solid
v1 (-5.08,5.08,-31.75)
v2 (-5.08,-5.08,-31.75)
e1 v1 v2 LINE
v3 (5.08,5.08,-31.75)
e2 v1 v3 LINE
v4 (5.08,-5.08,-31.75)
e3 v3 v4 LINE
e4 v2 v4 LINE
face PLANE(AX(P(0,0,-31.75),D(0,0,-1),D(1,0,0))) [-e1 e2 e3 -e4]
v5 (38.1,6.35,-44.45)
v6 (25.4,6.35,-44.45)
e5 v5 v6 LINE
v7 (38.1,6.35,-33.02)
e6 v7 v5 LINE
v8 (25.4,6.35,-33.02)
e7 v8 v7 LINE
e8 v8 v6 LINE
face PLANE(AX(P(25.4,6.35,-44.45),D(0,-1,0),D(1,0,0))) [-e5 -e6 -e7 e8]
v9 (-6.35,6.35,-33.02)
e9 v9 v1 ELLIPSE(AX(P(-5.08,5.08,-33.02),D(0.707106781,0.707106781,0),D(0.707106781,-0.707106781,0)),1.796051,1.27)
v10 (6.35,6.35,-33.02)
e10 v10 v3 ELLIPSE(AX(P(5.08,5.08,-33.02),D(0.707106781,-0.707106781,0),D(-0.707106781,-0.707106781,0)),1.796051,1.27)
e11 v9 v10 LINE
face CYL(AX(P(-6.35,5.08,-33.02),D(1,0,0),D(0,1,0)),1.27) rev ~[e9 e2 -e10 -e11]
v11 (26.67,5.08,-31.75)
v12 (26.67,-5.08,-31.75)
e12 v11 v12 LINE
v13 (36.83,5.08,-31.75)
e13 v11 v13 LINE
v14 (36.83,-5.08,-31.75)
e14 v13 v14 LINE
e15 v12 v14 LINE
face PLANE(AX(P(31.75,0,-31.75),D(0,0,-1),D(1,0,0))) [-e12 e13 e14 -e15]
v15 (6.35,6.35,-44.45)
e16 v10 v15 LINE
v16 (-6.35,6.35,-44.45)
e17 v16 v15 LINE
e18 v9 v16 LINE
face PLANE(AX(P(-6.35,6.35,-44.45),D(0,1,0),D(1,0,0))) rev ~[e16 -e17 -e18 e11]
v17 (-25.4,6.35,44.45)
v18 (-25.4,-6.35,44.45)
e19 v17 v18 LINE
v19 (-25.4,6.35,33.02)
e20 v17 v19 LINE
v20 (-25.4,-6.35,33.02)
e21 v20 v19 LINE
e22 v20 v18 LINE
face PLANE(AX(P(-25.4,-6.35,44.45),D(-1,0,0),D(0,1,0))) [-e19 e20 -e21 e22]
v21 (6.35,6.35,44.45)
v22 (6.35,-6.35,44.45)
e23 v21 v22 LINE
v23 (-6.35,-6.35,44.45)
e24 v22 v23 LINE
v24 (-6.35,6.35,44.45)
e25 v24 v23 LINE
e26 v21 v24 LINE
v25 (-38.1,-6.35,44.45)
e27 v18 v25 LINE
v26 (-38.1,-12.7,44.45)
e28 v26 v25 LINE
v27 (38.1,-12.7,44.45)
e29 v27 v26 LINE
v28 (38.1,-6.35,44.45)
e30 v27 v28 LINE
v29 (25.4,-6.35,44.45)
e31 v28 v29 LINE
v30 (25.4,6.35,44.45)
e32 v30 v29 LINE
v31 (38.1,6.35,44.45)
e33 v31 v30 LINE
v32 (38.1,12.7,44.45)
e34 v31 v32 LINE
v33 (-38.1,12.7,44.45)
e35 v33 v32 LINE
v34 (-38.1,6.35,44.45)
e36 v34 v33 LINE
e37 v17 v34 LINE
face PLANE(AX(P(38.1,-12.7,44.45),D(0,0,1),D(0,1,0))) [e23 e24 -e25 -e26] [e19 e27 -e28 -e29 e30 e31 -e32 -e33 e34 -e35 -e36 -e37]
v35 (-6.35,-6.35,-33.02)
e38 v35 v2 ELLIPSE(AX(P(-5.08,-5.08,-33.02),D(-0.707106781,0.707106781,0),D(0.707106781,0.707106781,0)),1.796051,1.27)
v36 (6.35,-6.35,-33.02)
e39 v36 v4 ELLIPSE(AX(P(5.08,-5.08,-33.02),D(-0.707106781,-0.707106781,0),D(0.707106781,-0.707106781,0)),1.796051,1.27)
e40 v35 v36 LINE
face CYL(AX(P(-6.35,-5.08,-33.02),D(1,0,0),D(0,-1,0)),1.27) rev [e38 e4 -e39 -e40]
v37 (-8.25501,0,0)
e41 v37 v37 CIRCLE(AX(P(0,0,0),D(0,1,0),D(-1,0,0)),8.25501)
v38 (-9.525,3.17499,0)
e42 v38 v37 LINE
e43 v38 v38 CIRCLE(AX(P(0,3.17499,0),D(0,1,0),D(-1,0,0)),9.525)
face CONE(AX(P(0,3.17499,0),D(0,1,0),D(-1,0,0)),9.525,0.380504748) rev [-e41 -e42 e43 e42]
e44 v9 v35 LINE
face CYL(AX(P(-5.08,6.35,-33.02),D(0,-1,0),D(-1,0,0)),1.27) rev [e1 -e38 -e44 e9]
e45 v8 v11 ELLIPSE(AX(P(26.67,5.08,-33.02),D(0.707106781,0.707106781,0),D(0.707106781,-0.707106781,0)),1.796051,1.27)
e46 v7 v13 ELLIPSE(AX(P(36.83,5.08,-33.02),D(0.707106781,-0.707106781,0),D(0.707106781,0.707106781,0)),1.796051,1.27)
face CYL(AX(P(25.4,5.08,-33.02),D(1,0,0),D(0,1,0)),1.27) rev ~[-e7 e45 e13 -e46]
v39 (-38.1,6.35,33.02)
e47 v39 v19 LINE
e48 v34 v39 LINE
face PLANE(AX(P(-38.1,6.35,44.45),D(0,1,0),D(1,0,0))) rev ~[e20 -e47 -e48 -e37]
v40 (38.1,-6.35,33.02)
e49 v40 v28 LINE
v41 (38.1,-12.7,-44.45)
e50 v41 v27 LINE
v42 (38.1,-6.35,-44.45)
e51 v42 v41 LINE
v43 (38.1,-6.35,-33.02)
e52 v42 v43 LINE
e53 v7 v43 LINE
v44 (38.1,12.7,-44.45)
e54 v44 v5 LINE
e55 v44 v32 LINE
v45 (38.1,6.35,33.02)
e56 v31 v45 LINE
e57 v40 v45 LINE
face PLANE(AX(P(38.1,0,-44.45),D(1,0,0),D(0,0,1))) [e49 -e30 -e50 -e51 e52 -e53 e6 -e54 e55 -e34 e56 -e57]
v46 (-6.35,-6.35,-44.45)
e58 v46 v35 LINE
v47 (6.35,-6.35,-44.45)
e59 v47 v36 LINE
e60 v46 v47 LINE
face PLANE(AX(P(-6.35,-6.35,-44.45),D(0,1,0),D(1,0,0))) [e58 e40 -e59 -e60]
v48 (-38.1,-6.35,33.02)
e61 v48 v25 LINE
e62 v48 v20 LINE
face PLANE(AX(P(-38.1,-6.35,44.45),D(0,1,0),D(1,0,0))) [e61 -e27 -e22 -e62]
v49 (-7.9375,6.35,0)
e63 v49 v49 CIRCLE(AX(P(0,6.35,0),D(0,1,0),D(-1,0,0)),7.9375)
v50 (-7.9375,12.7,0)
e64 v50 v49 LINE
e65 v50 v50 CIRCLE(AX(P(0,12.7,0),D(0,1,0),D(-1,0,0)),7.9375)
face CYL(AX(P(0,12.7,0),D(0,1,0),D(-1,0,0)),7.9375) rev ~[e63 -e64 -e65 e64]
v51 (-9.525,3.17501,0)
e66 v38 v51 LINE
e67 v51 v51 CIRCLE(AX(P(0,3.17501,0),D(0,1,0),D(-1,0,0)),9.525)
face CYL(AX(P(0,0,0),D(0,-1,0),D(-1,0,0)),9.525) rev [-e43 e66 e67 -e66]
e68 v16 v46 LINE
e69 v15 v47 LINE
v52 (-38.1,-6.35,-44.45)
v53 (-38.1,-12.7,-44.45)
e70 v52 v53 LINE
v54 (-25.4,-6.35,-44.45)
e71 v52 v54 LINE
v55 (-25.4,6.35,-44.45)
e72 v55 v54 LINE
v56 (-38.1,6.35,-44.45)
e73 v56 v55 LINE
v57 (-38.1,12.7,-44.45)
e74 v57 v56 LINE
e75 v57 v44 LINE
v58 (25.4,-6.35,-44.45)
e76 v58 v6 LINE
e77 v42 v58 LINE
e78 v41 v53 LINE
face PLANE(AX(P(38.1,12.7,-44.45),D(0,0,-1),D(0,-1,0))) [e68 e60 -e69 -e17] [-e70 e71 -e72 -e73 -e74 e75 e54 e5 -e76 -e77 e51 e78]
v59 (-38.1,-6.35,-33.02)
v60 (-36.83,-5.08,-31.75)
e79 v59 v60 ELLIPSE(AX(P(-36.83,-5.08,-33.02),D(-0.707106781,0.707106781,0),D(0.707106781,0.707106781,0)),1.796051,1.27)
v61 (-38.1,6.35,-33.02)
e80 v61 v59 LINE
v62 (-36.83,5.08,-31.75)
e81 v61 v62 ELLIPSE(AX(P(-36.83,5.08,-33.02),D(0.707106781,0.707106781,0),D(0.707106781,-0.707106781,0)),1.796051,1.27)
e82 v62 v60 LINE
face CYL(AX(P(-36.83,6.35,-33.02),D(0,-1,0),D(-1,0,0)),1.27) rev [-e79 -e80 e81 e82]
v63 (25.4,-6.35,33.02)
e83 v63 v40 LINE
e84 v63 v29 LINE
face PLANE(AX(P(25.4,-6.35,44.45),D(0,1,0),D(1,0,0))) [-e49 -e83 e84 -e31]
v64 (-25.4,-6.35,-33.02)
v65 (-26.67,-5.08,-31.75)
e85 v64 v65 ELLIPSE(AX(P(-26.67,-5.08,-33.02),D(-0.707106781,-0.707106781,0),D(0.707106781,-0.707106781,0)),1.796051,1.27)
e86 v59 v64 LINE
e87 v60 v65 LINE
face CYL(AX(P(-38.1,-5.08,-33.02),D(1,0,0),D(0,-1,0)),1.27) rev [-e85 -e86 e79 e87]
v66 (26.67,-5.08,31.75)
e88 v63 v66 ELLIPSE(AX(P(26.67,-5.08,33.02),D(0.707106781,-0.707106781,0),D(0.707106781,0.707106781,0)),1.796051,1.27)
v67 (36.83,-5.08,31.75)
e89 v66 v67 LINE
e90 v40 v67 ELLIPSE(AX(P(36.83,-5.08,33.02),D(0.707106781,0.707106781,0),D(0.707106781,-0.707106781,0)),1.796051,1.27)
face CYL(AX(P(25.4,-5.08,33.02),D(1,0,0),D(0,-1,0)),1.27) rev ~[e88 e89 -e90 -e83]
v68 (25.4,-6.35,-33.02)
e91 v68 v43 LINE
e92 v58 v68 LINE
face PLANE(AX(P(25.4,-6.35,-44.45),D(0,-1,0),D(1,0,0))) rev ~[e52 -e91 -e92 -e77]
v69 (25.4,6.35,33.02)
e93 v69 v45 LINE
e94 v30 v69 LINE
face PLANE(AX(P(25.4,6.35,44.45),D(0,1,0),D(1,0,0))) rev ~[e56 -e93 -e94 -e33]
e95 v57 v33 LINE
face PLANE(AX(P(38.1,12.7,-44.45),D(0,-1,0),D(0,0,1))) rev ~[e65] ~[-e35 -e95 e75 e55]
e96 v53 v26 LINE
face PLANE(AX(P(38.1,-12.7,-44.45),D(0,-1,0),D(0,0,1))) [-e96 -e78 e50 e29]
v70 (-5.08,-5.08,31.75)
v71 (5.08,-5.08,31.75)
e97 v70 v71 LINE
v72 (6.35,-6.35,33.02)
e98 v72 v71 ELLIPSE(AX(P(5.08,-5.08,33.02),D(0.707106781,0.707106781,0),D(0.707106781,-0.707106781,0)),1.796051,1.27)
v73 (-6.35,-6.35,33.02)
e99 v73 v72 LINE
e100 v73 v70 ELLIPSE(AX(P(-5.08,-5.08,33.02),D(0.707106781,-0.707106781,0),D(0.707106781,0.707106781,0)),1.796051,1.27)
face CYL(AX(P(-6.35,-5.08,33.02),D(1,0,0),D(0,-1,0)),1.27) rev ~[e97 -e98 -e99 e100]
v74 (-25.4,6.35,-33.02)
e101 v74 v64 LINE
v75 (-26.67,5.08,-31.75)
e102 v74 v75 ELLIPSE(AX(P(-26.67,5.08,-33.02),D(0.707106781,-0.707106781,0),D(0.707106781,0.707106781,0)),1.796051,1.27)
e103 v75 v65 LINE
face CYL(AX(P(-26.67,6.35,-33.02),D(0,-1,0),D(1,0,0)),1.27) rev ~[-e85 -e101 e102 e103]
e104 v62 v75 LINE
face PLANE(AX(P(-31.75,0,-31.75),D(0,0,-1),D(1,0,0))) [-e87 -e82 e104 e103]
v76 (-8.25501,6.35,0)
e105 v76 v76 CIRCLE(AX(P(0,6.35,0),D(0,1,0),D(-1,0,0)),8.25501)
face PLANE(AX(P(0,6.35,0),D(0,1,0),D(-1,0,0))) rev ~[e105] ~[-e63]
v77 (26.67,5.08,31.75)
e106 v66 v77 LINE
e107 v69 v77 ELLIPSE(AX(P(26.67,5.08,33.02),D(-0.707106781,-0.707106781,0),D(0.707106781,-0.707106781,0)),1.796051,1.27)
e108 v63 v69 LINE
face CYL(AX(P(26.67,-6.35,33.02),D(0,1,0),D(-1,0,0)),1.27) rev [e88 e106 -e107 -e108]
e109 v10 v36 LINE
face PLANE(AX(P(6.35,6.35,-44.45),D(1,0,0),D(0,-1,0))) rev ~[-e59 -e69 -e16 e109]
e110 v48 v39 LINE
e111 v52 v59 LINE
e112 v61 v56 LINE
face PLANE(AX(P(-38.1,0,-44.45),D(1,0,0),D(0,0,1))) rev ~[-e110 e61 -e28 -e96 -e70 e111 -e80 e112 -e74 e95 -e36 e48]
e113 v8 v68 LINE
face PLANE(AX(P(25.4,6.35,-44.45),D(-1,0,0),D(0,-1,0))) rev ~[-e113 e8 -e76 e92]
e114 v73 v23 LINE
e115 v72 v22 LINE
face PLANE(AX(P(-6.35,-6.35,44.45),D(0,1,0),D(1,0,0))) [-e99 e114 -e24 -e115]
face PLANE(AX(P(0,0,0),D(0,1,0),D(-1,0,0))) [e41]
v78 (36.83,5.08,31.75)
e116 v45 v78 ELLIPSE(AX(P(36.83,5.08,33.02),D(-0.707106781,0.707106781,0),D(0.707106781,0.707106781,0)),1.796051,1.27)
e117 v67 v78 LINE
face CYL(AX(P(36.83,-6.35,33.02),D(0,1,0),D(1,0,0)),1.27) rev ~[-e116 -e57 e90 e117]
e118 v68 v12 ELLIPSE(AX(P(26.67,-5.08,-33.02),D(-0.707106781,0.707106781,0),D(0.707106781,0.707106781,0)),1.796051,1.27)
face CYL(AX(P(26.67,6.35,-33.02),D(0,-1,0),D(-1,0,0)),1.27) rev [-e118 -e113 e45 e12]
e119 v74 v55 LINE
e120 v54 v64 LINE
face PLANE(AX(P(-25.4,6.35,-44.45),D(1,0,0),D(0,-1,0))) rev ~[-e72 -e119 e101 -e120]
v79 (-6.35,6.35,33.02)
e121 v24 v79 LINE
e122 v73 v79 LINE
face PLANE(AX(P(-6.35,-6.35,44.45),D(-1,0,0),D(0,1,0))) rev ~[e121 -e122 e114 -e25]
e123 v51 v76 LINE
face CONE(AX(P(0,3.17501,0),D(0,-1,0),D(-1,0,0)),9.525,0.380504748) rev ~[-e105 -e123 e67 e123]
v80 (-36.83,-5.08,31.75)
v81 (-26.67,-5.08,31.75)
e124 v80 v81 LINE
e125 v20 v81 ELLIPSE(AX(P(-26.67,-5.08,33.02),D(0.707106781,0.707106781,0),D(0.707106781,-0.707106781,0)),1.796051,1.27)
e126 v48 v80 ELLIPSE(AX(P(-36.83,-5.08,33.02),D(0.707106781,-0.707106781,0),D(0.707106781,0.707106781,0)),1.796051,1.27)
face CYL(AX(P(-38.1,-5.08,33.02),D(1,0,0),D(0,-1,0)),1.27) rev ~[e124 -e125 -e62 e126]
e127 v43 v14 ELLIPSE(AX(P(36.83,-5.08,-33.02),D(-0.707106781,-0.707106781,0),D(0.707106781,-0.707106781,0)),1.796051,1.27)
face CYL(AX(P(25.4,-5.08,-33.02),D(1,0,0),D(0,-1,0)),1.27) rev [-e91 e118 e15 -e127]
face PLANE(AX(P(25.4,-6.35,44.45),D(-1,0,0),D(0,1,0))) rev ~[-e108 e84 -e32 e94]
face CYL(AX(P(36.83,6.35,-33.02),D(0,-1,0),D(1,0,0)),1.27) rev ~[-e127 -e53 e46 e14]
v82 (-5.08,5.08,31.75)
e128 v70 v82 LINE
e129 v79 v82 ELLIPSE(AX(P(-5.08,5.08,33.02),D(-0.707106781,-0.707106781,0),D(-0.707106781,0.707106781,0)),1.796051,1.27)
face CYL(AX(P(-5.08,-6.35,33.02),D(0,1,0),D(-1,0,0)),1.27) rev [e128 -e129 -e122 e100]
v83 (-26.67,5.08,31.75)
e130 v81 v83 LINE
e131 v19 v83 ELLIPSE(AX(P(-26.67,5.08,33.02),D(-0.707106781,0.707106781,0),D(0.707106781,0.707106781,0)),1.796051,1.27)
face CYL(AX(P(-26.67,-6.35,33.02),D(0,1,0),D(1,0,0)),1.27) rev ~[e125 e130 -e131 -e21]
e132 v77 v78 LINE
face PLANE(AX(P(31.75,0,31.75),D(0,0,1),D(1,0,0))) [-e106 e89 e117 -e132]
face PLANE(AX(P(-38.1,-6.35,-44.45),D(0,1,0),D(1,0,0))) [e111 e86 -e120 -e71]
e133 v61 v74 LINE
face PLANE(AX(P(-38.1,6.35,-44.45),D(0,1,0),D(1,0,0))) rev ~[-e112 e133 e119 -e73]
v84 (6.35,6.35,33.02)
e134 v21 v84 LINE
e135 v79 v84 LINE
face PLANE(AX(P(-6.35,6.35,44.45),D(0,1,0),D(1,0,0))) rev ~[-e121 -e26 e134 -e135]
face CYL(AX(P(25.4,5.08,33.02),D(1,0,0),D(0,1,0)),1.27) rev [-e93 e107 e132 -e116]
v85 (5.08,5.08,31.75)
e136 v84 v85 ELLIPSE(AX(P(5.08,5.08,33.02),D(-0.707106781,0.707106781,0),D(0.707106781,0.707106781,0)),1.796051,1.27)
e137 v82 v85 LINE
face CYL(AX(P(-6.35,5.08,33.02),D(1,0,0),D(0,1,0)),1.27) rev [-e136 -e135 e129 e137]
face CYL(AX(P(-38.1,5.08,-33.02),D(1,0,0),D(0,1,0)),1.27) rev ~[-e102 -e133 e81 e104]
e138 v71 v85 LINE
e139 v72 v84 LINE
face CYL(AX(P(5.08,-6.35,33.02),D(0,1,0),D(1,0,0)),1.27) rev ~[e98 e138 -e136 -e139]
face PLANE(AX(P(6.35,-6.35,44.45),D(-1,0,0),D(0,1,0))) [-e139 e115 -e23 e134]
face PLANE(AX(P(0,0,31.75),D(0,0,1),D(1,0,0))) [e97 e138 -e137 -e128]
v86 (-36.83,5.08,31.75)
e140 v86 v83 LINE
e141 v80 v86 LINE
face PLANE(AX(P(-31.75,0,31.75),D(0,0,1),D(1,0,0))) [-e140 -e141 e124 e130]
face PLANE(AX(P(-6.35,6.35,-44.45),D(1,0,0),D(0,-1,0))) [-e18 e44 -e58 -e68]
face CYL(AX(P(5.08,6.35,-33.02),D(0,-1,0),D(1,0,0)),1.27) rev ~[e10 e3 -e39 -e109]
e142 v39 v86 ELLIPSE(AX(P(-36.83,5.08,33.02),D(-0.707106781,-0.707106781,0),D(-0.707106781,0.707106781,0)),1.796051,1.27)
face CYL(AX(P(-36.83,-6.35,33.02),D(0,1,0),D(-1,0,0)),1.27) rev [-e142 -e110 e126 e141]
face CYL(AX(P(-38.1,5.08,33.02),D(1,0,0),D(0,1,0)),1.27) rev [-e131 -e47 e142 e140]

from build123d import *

# Parameters (mm, degrees)
F0_W      = 76.2
F0_H      = 88.9
F1_DEPTH  = 12.7
F4_DEPTH  = 12.7
F2_W      = 12.7
F2_H      = 12.7
F3_W      = 12.7
F3_H      = 12.7
F5_DEPTH  = 12.7
F6_R      = 1.27
F7_DEPTH  = 12.7
F8_R      = 7.9375
F9_DEPTH  = 12.7
F10_R     = 9.525
F11_DEPTH = 6.35
F12_SIZE2 = 1.26999
F12_SIZE  = 3.17499


# Not quite as in the source:
# - a fillet or chamfer is up to 0.001 mm smaller than in the source, because OpenCascade refuses the exact size


with BuildPart() as f1:
    # F0 (on Front) → F1 (new body, symmetric)
    with BuildSketch(Plane.XZ):
        Rectangle(F0_W, F0_H)
    extrude(amount=F1_DEPTH, both=True)

    # F4 (add, symmetric): faces of the model
    f4_faces = [f1.faces().sort_by_distance(p)[0] for p in [
        (-38.1, 0, 0),
        (38.1, 0, 0),
    ]]
    extrude(f4_faces, amount=F4_DEPTH, both=True, dir=(-1, 0, 0))

    # F2 (on face) + F3 (on face) → F5 (cut, symmetric)
    with BuildSketch(Plane.XY.offset(44.45)):
        with Locations((-31.75, 0)):
            Rectangle(F2_W, F2_H)
        Rectangle(F2_W, F2_H)
        with Locations((31.75, 0)):
            Rectangle(F2_W, F2_H)
    with BuildSketch(Plane(origin=(0, 0, -44.45), x_dir=(1, 0, 0), z_dir=(0, 0, -1))):
        with Locations((-31.75, 0)):
            Rectangle(F3_W, F3_H)
        Rectangle(F3_W, F3_H)
        with Locations((31.75, 0)):
            Rectangle(F3_W, F3_H)
    extrude(amount=F5_DEPTH, both=True, dir=(0, 0, 1), mode=Mode.SUBTRACT)

    # F6
    f6_edges = [f1.edges().sort_by_distance(p)[0] for p in [
        (-38.1, 0, 31.75),
        (-31.75, -6.35, 31.75),
        (-25.4, 0, 31.75),
        (-31.75, 6.35, 31.75),
        (-6.35, 0, 31.75),
        (0, -6.35, 31.75),
        (6.35, 0, 31.75),
        (0, 6.35, 31.75),
        (31.75, -6.35, 31.75),
        (38.1, 0, 31.75),
        (31.75, 6.35, 31.75),
        (25.4, 0, 31.75),
        (-31.75, 6.35, -31.75),
        (-25.4, 0, -31.75),
        (-31.75, -6.35, -31.75),
        (-38.1, 0, -31.75),
        (6.35, 0, -31.75),
        (0, -6.35, -31.75),
        (-6.35, 0, -31.75),
        (0, 6.35, -31.75),
        (31.75, 6.35, -31.75),
        (38.1, 0, -31.75),
        (31.75, -6.35, -31.75),
        (25.4, 0, -31.75),
    ]]
    fillet(f6_edges, radius=F6_R)

    # F7 (cut, symmetric): faces of the model
    f7_faces = [f1.faces().sort_by_distance(p)[0] for p in [
        (50.8, 0, 0),
        (-50.8, 0, 0),
    ]]
    extrude(f7_faces, amount=F7_DEPTH, both=True, dir=(1, 0, 0), mode=Mode.SUBTRACT)

    # F8 (on face) → F9 (cut)
    with BuildSketch(Plane(origin=(0, 12.7, 0), x_dir=(-1, 0, 0), z_dir=(0, 1, 0))):
        Circle(F8_R)
    extrude(amount=-F9_DEPTH, mode=Mode.SUBTRACT)

    # F10 (on face) → F11 (cut)
    with BuildSketch(Plane(origin=(0, 0, 0), x_dir=(-1, 0, 0), z_dir=(0, 1, 0))):
        Circle(F10_R)
    extrude(amount=F11_DEPTH, mode=Mode.SUBTRACT)

    # F12 (size 3.175 and 1.27 in the source; OpenCascade refuses exactly that, so slightly less here)
    f12_edges = [f1.edges().sort_by_distance(p)[0] for p in [
        (9.525, 0, 0),
        (9.525, 6.35, 0),
    ]]
    f12_side = f1.faces().sort_by_distance((9.525, 3.175, 0))[0]
    chamfer(f12_edges, length=F12_SIZE, length2=F12_SIZE2, reference=f12_side)


solid = f1.part
